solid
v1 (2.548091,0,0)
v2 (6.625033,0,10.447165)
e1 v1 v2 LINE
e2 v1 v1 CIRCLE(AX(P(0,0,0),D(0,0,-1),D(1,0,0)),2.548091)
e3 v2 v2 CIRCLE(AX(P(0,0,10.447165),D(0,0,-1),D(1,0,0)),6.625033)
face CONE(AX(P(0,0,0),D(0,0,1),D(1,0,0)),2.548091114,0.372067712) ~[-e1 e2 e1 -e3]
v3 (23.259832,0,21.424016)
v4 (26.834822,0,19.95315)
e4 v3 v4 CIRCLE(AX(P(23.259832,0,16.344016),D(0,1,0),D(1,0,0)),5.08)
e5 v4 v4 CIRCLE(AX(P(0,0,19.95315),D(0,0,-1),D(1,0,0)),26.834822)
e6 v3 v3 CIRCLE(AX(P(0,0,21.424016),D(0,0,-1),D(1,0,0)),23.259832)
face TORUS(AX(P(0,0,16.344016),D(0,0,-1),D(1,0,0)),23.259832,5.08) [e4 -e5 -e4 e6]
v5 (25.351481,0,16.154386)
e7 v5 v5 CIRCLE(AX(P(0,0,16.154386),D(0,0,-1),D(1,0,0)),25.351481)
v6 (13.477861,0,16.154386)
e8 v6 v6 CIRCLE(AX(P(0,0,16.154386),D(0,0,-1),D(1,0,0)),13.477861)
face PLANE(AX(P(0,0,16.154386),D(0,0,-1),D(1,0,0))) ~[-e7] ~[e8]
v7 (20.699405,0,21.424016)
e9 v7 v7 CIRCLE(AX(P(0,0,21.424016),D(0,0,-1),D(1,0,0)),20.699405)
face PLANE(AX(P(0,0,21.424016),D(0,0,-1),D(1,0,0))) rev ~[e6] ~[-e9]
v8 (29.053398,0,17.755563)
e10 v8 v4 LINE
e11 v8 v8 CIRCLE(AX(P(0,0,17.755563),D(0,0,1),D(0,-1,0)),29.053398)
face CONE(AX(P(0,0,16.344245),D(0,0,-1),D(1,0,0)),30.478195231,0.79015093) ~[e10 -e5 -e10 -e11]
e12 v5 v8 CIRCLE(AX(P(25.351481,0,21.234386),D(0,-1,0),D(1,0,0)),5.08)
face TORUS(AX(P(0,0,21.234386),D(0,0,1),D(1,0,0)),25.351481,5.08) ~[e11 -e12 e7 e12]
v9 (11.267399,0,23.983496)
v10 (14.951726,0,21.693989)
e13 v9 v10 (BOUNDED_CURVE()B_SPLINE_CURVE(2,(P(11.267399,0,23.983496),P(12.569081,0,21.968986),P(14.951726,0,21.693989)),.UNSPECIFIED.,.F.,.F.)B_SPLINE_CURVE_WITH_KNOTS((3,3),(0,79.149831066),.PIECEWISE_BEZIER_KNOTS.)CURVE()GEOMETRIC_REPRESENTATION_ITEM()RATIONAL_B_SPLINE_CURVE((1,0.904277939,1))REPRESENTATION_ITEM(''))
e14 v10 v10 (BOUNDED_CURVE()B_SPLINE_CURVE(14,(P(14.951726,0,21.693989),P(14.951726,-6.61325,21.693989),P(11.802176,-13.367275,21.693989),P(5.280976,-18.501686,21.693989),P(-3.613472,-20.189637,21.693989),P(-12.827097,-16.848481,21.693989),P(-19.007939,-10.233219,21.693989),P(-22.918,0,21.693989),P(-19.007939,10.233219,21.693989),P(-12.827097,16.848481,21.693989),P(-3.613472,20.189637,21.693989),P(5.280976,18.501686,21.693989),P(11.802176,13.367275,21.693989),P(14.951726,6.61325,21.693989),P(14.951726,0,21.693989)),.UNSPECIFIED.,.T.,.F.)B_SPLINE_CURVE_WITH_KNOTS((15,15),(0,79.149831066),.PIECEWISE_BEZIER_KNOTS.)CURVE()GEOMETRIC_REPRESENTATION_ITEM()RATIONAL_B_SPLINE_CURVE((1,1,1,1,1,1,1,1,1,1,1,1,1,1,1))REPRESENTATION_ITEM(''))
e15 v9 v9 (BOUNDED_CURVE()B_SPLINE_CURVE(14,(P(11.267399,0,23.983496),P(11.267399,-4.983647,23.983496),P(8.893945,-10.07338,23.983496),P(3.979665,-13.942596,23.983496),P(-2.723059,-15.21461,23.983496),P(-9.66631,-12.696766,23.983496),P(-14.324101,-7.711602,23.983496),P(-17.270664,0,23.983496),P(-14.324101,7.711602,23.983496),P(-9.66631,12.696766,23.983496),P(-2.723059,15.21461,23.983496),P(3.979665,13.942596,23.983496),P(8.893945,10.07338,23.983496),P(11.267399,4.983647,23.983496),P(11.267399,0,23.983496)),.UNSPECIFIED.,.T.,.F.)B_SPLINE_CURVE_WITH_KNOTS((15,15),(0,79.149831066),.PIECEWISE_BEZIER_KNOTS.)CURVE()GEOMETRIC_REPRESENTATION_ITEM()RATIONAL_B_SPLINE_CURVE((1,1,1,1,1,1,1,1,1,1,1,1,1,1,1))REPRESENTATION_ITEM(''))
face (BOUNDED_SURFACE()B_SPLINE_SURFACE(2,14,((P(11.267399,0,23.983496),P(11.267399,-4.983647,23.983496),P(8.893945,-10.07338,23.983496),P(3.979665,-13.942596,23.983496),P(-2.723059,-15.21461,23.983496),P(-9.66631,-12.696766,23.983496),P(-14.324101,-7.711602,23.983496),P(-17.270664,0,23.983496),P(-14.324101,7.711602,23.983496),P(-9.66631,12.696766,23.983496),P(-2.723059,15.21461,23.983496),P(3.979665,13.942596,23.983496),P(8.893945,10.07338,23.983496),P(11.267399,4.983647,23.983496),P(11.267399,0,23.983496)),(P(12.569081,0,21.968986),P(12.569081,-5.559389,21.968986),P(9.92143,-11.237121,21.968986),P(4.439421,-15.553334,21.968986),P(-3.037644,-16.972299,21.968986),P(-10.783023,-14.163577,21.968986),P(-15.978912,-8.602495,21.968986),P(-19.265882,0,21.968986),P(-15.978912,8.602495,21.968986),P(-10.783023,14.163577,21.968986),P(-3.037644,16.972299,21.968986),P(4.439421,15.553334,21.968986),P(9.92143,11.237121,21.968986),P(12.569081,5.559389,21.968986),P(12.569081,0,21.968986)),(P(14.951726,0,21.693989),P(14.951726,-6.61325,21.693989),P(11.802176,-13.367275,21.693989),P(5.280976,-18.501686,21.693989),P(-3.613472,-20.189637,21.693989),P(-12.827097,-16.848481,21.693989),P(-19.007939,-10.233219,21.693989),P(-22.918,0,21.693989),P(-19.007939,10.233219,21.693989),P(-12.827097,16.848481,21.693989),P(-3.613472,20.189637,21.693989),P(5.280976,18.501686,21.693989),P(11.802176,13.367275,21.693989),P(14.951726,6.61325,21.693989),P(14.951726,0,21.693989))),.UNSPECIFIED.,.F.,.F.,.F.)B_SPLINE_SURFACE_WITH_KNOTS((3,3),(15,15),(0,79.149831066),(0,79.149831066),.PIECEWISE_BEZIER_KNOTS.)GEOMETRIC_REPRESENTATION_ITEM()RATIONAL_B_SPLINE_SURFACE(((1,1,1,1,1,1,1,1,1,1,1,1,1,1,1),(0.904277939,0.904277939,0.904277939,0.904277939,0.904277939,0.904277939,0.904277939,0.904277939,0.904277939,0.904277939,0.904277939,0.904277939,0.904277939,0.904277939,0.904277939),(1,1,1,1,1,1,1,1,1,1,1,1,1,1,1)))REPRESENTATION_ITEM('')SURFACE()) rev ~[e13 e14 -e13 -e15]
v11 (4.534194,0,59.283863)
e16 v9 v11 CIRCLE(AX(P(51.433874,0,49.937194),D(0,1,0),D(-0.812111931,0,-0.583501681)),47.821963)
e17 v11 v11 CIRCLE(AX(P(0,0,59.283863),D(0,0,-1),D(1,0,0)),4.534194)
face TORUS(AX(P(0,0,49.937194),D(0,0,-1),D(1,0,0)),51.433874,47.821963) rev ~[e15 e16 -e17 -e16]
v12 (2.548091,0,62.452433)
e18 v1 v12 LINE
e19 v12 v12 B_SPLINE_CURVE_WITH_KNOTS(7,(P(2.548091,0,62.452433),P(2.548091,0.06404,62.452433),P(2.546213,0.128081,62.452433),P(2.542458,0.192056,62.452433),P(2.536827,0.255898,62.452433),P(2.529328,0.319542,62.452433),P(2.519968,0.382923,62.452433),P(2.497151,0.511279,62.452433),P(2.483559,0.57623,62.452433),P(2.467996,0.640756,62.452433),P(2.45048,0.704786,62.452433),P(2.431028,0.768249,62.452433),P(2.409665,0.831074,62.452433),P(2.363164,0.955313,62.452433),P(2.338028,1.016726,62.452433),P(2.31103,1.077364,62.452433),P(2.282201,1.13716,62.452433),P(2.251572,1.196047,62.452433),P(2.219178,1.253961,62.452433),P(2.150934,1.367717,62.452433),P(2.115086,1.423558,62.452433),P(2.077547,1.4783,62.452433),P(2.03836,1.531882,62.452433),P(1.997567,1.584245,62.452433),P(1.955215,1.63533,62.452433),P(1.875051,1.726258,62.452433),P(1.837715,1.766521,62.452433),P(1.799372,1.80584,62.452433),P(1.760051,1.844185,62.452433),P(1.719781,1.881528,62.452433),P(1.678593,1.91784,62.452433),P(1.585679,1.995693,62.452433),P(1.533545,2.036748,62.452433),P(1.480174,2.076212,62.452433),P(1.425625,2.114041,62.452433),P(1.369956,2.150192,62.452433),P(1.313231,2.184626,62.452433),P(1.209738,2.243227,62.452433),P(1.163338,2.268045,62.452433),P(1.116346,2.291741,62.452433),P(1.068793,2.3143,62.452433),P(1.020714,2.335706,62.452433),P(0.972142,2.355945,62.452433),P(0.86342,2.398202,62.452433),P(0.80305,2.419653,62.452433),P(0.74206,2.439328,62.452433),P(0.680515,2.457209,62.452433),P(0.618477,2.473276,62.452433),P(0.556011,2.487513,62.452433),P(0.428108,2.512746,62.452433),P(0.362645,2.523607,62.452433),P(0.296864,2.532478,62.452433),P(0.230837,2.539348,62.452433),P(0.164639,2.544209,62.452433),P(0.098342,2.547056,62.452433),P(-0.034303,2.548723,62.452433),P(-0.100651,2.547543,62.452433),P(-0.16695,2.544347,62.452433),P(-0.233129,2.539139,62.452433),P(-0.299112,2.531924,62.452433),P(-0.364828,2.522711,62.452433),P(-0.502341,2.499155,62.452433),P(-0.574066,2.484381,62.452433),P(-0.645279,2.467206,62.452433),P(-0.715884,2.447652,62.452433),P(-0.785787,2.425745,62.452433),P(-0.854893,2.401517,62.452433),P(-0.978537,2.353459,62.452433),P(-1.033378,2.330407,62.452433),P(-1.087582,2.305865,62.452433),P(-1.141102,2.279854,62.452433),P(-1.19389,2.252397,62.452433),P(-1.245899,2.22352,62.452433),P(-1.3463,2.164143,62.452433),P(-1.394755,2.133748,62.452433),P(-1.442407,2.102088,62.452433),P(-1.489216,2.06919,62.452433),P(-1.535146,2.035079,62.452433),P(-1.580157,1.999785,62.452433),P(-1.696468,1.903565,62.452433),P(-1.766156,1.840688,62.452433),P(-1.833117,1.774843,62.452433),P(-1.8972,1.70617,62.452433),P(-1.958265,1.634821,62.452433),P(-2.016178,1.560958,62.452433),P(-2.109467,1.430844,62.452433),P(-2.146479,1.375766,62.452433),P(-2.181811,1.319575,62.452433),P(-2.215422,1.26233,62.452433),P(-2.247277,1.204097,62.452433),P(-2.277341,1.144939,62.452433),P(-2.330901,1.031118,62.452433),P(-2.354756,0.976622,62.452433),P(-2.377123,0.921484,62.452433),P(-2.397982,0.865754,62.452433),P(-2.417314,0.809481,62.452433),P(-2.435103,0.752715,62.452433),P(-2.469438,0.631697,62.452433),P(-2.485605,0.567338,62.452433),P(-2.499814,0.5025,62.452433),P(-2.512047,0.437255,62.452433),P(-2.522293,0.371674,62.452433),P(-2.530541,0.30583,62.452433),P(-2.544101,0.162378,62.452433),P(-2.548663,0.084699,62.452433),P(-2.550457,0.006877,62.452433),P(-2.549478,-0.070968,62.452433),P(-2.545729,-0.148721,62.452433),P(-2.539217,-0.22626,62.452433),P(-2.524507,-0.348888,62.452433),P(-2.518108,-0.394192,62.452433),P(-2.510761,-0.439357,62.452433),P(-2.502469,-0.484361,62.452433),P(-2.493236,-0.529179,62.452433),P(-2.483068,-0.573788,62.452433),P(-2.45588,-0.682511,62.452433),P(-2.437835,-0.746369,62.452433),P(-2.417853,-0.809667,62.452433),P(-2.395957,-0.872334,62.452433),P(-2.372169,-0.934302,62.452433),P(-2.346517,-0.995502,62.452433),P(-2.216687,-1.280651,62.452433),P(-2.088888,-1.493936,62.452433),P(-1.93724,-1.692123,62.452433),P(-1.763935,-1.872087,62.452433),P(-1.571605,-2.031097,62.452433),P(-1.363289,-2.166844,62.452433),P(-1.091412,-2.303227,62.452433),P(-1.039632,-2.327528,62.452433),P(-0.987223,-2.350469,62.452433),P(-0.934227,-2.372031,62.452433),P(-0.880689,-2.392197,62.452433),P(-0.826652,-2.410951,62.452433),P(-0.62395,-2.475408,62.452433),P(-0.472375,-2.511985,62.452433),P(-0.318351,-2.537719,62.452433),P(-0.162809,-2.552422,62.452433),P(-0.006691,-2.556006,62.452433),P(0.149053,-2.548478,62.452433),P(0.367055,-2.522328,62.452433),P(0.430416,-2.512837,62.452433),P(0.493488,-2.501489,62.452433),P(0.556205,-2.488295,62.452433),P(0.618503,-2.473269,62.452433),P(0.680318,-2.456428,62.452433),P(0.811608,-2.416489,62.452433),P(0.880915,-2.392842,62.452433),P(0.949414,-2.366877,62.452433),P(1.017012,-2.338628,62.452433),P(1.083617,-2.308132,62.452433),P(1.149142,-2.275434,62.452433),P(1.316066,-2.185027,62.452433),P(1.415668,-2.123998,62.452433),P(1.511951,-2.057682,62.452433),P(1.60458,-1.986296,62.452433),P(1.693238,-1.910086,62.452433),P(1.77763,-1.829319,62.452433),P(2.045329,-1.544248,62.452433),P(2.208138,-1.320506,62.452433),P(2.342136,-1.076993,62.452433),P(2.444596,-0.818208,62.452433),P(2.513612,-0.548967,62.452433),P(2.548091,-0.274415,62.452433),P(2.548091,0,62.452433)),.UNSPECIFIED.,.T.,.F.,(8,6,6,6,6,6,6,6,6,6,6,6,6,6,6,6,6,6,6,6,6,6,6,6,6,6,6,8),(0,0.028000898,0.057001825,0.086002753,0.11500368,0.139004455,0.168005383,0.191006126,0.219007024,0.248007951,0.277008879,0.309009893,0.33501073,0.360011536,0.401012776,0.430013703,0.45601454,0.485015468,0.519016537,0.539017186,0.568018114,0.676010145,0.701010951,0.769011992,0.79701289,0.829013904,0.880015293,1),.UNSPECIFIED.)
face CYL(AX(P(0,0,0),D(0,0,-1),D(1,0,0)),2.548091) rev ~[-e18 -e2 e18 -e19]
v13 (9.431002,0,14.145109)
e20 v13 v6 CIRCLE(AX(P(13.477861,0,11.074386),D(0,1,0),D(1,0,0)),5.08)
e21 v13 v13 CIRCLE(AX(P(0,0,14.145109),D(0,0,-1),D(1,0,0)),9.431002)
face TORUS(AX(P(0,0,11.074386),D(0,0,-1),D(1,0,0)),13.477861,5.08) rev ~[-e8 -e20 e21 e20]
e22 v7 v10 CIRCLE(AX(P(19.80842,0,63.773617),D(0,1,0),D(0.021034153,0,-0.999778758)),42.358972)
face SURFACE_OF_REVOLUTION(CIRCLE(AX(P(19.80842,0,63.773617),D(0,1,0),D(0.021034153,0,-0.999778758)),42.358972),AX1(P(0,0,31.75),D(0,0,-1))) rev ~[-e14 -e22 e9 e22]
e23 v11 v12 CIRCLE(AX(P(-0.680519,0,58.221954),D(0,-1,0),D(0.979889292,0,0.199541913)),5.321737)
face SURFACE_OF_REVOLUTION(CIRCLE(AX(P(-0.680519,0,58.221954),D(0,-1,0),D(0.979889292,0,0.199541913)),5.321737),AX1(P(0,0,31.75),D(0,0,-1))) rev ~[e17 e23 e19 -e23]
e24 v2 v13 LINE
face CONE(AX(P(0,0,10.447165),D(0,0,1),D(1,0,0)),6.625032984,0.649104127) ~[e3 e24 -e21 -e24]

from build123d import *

# Parameters (mm, degrees)
F2_DEPTH = 63.5010001
F3_R     = 5.08
F5_R     = 5.08
F6_R     = 5.08


# Not quite as in the source:
# - a fillet or chamfer that OpenCascade refuses, or shapes differently, is made with other operations: its cross-section is extruded or revolved along the edge and cut away or added


with BuildPart() as f1:
    # F0 (on Front) → F1 (revolve)
    with BuildSketch(Plane.XZ):
        with BuildLine():
            ThreePointArc((4.5341940657, 59.2838630326), (2.9433454488, 62.1191947856), (0, 63.5))
            Line((0, 63.5), (0, 0))
            Line((0, 0), (2.5480911136, 0))
            Line((2.5480911136, 0), (6.6250329837, 10.4471649975))
            Line((6.6250329837, 10.4471649975), (10.9556252941, 16.1543861032))
            Line((10.9556252941, 16.1543861032), (30.48, 16.1543861032))
            Line((30.48, 16.1543861032), (30.4299078499, 21.4240159839))
            Line((30.4299078499, 21.4240159839), (20.699405237, 21.4240159839))
            ThreePointArc((20.699405237, 21.4240159839), (16.6336106625, 21.5337881018), (12.597086859, 22.0329985023))
            ThreePointArc((12.597086859, 22.0329985023), (4.6942529553, 39.8204748482), (4.5341940657, 59.2838630326))
        make_face()
    revolve(axis=Axis((0, 0, 31.75), (0, 0, -1)))

    # F2 (cut, through all): a face of the model
    f2_faces = [f1.faces().sort_by_distance(p)[0] for p in [
        (0, 0, 0),
    ]]
    extrude(f2_faces, amount=-F2_DEPTH, mode=Mode.SUBTRACT)

    # F3
    f3_edges = [f1.edges().sort_by_distance(p)[0] for p in [
        (-10.955625, 0, 16.154386),
        (-30.48, 0, 16.154386),
    ]]
    fillet(f3_edges, radius=F3_R)

    # F4: chamfer of 5.08 on 1 edges, made by hand

    # F4_s1 → F4_t2 (revolve, cut)
    with BuildSketch(Plane.XZ):
        Polygon((30.478195231, 16.3442454843), (25.3499078499, 21.4240159839), (30.4299078499, 21.4240159839), align=None)
    revolve(axis=Axis((0, 0, 21.4240159839), (0, 0, -1)), mode=Mode.SUBTRACT)

    # F5
    f5_edges = [f1.edges().sort_by_distance(p)[0] for p in [
        (-20.699405, 0, 21.424016),
        (-12.597087, 0, 22.032999),
        (16.633611, 0, 21.533788),
    ]]
    fillet(f5_edges, radius=F5_R)

    # F6
    f6_edges = [f1.edges().sort_by_distance(p)[0] for p in [
        (-25.349908, 0, 21.424016),
        (-20.699405, 0, 21.424016),
    ]]
    fillet(f6_edges, radius=F6_R)


solid = f1.part
